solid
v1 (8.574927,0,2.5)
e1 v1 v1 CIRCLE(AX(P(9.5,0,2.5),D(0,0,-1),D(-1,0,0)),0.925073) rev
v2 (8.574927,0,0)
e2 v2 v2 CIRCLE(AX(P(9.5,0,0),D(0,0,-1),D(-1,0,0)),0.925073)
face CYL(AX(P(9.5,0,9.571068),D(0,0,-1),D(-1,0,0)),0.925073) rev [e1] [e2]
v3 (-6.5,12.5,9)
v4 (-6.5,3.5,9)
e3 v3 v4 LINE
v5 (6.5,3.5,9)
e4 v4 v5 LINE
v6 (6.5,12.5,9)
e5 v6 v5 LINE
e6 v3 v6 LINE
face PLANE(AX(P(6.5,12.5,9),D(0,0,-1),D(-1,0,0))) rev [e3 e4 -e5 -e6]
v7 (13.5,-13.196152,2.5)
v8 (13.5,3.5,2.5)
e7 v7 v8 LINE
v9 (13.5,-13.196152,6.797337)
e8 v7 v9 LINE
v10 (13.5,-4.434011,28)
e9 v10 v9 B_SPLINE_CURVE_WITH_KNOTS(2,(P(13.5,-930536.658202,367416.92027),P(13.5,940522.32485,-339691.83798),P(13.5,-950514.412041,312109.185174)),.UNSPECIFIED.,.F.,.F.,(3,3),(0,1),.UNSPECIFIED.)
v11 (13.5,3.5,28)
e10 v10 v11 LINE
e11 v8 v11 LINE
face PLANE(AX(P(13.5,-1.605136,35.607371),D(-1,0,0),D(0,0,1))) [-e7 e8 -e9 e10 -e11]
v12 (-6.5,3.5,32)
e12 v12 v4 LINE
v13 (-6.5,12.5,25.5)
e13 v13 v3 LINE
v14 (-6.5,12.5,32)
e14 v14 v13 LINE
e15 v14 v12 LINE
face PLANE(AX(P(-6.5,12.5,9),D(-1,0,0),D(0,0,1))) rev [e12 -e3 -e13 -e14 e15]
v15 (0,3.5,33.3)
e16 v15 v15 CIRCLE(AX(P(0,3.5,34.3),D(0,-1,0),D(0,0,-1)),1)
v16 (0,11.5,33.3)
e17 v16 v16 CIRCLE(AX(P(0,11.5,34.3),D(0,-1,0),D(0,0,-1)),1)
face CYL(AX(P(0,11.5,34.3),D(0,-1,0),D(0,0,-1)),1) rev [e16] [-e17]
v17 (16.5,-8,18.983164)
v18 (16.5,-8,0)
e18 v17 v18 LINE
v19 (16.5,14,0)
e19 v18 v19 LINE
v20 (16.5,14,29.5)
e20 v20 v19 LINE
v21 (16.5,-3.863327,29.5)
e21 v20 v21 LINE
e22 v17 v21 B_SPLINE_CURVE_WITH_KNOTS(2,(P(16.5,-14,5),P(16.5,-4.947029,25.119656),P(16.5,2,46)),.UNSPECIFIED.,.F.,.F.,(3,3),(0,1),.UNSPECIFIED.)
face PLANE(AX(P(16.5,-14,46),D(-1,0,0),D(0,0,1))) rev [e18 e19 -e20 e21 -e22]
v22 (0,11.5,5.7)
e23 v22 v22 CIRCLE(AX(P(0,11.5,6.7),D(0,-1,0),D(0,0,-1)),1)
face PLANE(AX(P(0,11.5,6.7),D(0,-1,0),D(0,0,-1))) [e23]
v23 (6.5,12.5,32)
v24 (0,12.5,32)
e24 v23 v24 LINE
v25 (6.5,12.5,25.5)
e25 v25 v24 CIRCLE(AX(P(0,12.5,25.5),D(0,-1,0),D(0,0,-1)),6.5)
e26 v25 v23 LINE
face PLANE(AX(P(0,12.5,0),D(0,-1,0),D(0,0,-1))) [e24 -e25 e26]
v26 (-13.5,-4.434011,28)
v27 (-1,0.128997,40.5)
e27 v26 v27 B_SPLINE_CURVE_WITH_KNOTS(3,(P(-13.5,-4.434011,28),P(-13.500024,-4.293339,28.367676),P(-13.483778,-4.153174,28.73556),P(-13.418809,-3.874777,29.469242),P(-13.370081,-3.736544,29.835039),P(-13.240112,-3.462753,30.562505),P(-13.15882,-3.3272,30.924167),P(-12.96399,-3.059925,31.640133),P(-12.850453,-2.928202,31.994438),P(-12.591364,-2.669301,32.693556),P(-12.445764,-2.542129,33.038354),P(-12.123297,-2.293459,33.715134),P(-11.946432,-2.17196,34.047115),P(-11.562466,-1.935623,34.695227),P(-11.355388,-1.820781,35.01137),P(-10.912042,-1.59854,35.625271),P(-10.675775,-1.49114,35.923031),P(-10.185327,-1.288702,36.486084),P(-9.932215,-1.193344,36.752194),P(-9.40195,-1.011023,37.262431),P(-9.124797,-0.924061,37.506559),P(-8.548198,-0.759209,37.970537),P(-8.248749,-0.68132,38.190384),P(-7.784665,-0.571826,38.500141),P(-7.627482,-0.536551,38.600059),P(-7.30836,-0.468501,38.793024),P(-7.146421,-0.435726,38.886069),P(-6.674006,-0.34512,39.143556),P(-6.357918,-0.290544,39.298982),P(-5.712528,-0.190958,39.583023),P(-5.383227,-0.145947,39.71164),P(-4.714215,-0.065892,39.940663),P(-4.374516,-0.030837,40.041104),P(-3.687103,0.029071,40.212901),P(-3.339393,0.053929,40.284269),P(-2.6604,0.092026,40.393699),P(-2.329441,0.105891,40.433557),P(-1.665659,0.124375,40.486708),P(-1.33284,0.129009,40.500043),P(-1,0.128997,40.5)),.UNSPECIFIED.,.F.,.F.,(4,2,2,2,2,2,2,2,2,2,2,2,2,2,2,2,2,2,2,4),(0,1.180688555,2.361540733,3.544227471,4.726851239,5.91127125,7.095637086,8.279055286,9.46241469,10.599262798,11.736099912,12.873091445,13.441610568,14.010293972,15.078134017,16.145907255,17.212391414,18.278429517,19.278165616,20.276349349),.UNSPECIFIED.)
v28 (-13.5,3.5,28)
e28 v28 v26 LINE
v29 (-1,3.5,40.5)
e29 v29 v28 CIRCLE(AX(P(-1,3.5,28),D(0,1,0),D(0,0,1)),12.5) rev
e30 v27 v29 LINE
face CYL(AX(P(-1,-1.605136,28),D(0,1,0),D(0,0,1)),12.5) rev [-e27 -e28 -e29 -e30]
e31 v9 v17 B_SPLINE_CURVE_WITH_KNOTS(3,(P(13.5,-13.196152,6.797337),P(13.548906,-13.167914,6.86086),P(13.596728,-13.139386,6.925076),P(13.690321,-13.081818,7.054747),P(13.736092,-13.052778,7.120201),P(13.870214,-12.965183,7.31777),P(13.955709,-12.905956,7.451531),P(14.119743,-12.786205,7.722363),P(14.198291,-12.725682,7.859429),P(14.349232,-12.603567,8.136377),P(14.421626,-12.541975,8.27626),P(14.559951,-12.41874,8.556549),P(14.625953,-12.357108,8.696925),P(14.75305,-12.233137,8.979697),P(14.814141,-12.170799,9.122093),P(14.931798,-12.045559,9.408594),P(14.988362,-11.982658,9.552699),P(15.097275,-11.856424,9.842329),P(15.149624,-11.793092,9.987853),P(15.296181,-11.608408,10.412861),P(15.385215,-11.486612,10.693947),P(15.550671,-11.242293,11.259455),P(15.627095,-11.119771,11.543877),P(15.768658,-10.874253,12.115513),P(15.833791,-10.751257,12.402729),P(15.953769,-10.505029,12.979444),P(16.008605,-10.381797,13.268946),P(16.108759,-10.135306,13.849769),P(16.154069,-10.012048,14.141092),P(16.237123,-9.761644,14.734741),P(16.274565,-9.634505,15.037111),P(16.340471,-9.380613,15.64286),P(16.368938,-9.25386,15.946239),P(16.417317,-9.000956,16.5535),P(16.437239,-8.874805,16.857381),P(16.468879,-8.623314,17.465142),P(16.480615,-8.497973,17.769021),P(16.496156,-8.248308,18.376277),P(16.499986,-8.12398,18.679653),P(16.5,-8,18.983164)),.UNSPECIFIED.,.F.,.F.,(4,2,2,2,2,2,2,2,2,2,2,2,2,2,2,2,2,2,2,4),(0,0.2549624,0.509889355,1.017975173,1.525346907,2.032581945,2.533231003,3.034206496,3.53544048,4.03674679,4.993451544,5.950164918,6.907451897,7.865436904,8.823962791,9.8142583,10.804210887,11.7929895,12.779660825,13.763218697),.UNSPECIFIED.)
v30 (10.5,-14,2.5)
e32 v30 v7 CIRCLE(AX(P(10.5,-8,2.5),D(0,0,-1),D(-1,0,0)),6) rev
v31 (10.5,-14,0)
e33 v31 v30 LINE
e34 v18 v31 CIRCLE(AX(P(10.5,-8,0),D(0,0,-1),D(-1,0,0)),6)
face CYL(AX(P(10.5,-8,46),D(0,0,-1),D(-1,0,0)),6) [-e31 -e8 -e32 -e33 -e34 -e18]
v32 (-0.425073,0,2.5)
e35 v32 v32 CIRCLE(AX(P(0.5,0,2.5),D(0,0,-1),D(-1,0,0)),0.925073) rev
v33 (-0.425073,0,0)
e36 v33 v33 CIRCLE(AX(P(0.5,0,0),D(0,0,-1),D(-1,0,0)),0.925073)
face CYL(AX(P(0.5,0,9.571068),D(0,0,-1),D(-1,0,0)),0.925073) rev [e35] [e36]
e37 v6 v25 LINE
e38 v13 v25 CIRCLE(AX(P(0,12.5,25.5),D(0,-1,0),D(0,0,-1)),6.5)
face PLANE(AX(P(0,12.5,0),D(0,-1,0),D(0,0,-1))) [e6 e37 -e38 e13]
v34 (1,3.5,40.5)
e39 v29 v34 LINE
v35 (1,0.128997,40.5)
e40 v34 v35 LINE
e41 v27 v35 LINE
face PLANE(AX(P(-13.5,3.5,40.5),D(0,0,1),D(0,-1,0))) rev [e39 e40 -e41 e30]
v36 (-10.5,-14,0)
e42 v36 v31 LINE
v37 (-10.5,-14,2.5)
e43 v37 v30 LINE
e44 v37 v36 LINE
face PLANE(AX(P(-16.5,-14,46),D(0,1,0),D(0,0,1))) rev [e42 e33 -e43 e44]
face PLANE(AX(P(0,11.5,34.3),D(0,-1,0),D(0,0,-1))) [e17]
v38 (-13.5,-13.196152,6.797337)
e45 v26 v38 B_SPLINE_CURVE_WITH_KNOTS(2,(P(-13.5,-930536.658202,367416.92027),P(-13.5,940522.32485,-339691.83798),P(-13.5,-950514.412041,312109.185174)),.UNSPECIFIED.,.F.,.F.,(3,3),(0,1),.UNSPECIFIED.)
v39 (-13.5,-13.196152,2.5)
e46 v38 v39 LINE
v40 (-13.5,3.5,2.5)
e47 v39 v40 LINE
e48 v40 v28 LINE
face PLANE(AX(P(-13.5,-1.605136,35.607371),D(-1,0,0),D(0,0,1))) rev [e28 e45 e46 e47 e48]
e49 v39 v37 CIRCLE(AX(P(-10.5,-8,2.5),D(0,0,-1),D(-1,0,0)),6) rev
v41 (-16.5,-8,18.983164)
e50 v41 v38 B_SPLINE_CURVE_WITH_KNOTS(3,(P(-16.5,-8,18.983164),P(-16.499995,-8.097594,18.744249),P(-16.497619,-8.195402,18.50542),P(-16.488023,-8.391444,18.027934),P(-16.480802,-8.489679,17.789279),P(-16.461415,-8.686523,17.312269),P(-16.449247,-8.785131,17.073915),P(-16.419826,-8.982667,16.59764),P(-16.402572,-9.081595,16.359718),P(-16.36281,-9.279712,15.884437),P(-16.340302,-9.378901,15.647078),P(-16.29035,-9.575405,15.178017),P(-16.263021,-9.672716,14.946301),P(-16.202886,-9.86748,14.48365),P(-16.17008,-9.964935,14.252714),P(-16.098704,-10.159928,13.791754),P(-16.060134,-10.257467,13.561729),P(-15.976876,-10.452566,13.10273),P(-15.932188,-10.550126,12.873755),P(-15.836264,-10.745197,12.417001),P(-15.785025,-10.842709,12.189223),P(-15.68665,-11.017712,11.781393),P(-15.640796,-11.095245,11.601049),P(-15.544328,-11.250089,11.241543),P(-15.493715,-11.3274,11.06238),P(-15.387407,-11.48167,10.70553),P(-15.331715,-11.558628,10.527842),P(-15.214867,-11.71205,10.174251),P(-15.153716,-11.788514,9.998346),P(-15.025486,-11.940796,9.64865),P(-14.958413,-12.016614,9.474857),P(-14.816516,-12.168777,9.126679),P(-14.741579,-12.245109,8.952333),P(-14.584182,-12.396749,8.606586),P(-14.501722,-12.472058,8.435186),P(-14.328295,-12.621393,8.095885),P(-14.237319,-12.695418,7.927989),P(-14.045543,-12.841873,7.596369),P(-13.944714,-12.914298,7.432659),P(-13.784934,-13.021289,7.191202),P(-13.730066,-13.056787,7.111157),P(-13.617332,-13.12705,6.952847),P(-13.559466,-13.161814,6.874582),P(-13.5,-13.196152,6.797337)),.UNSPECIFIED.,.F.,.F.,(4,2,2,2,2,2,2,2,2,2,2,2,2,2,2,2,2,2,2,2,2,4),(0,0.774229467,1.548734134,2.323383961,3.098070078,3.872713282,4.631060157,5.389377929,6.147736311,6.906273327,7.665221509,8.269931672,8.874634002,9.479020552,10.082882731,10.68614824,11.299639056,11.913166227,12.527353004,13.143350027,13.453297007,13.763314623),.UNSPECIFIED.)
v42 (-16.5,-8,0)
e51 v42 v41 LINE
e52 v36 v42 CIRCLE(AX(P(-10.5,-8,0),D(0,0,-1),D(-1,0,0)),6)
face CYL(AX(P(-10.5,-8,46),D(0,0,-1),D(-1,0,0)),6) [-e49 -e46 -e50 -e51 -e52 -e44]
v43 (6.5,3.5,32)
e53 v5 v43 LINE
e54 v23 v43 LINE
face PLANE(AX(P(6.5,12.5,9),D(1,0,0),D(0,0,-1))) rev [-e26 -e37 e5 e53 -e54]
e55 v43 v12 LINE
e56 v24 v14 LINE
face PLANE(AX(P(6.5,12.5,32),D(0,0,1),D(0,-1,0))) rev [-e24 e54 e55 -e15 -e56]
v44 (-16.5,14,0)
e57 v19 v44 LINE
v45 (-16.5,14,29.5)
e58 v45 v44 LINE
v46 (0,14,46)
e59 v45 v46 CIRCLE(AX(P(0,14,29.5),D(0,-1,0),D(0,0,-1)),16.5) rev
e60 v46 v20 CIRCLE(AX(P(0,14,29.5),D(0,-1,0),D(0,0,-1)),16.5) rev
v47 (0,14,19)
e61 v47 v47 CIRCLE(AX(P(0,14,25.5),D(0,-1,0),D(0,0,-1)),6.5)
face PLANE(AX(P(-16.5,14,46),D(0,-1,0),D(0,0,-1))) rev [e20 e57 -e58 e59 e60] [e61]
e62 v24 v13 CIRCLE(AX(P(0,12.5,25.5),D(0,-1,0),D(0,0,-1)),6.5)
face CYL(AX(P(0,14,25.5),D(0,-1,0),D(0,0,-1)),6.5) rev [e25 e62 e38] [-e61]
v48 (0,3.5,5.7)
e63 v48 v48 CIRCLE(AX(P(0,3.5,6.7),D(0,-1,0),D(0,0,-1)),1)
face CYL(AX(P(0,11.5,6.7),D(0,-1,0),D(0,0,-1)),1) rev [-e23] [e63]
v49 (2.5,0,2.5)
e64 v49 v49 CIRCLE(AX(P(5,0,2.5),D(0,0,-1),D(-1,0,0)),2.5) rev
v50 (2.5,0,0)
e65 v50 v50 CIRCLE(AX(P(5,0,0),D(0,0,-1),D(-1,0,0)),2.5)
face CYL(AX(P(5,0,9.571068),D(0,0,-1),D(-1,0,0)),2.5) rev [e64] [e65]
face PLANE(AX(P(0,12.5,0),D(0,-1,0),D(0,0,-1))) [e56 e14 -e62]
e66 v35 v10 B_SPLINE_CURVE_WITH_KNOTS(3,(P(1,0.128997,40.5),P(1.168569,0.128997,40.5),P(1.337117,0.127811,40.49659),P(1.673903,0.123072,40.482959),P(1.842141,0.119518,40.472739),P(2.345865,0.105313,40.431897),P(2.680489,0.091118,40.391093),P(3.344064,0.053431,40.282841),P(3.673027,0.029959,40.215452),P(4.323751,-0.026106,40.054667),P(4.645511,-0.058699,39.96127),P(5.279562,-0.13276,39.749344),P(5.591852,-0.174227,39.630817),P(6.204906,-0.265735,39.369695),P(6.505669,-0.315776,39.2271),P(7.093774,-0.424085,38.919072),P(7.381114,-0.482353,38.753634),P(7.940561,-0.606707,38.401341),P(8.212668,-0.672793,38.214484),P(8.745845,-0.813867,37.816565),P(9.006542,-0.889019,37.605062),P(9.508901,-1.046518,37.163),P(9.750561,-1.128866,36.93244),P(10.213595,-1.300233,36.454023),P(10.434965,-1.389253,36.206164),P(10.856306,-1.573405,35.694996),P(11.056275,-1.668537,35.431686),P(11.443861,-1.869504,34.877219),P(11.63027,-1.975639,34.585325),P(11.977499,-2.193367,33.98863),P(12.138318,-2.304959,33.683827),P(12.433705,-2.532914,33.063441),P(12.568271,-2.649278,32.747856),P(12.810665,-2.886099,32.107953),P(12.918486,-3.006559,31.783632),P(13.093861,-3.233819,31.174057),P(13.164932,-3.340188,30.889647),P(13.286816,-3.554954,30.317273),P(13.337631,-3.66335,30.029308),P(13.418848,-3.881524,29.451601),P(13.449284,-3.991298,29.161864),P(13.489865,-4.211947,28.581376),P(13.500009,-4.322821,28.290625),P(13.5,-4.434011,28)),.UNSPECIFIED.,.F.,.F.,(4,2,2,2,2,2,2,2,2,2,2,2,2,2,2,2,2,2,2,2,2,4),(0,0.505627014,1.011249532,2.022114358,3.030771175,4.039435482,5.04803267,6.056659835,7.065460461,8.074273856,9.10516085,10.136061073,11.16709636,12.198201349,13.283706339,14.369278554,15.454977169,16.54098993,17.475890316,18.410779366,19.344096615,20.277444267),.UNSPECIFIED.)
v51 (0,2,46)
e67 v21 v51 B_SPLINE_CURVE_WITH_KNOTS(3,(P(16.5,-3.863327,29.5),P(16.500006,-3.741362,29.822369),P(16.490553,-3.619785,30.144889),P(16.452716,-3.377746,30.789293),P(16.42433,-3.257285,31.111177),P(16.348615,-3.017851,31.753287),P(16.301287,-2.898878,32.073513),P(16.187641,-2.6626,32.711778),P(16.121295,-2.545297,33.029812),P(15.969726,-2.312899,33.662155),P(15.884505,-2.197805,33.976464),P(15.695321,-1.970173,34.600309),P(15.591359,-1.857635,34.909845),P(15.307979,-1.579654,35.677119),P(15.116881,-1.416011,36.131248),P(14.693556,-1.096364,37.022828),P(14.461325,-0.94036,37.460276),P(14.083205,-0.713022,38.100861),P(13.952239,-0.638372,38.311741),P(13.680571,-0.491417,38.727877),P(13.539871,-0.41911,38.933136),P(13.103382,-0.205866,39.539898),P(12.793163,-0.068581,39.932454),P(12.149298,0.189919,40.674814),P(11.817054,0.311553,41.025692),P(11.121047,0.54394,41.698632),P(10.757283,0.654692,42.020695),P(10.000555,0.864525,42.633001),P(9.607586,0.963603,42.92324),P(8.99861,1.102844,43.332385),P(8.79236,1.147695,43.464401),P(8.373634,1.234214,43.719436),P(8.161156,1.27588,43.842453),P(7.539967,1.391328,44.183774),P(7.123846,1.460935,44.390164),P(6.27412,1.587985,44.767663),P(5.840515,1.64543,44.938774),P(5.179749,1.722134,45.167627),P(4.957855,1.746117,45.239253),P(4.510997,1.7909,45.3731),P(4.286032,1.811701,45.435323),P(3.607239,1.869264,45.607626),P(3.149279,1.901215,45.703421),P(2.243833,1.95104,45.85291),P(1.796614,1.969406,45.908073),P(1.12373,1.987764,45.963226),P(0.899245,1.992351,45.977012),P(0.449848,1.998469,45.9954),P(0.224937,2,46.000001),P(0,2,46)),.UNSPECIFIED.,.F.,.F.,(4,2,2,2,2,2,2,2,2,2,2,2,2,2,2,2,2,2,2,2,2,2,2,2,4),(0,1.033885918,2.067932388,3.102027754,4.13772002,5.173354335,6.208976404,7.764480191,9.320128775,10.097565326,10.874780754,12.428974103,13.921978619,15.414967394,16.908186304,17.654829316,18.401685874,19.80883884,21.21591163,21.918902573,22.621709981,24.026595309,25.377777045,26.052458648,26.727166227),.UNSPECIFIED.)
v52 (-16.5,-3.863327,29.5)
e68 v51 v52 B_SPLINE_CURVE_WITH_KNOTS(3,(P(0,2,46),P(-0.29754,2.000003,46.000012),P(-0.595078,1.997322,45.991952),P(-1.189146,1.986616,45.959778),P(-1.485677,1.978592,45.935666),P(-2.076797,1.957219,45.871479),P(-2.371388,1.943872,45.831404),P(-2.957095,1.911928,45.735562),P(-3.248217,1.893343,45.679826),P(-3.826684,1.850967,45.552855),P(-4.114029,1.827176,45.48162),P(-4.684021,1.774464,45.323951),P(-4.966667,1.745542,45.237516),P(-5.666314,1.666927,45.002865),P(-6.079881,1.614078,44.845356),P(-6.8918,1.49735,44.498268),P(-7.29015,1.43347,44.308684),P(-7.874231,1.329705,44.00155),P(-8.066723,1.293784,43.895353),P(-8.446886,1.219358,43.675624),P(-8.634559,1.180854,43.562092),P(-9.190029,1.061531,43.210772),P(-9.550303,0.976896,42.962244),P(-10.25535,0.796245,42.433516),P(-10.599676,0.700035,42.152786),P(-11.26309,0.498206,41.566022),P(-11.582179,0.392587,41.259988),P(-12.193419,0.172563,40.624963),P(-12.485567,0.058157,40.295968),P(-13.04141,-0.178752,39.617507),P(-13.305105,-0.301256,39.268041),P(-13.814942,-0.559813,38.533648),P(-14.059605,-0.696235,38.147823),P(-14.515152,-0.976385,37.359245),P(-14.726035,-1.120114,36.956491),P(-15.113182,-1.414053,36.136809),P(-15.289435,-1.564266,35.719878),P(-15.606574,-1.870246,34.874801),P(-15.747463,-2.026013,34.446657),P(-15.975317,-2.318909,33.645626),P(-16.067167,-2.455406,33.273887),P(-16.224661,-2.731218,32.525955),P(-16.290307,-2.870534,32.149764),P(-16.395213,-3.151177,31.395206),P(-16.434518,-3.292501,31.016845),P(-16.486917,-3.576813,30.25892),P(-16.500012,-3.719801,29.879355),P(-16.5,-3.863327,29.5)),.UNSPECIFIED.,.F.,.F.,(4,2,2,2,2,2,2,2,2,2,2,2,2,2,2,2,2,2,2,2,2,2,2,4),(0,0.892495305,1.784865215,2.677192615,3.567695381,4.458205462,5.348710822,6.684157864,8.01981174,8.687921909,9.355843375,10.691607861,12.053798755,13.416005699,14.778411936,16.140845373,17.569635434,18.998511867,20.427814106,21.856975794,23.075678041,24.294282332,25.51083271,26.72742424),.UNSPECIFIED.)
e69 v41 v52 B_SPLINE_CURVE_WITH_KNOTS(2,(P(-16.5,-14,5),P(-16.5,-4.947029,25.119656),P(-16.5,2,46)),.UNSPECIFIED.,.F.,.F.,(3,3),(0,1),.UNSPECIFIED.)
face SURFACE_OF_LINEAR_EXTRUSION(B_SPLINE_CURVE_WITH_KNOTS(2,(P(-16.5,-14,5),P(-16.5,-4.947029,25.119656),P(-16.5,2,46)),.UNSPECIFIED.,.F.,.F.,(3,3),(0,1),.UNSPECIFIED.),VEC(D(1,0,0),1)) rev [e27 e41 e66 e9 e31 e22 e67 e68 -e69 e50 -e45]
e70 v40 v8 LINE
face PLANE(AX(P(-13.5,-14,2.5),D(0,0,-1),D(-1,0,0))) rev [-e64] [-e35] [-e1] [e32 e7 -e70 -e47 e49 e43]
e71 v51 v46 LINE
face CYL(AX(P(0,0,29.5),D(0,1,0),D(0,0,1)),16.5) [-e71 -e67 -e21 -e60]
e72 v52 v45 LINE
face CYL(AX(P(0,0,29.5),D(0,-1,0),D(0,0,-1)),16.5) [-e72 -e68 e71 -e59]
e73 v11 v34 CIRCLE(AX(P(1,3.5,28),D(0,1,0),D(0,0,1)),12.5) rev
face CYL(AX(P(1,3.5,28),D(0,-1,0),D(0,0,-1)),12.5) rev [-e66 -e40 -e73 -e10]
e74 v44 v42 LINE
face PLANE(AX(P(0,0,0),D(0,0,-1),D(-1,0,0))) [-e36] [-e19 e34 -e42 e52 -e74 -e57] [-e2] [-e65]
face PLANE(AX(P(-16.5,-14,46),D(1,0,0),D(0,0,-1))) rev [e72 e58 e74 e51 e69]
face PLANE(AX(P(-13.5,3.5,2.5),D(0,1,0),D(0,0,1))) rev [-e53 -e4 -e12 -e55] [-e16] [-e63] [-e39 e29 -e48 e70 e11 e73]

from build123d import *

# Parameters (mm, degrees)
SKETCH1_W           = 33
SKETCH1_H           = 28
BOSS_EXTRUDE1_DEPTH = 46
CUT_EXTRUDE1_DEPTH  = 59.318093247
CUT_EXTRUDE4_START  = -3
CUT_EXTRUDE4_DEPTH  = 27
FILLET1_R           = 12.5
FILLET2_R           = 16.5
FILLET3_R           = 6
SKETCH5_W           = 13
SKETCH5_H           = 23
CUT_EXTRUDE8_DEPTH  = 9
SKETCH6_R           = 6.5
CUT_EXTRUDE9_DEPTH  = 56.592265809
SKETCH7_R           = 1
CUT_EXTRUDE10_DEPTH = 8
SKETCH8_R           = 0.925072744
SKETCH8_R_2         = 2.5
CUT_EXTRUDE11_DEPTH = 2.5


with BuildPart() as part:
    # Sketch1 → Boss-Extrude1 (new body)
    with BuildSketch(Plane.XY):
        Rectangle(SKETCH1_W, SKETCH1_H)
    extrude(amount=BOSS_EXTRUDE1_DEPTH)

    # Sketch3 → Cut-Extrude1 (cut, through all)
    with BuildSketch(Plane(origin=(16.5, 0, 0), x_dir=(0, 0, -1), z_dir=(1, 0, 0))):
        with BuildLine():
            Line((-46, 2), (-46, -14))
            Line((-46, -14), (-5, -14))
            add(Edge.make_bspline(
                [(-5, -14), (-25.11965555, -4.947029267), (-46, 2)],
                knots=[0, 0, 0, 1, 1, 1], degree=2))
        make_face()
    extrude(amount=-CUT_EXTRUDE1_DEPTH, mode=Mode.SUBTRACT)

    # Sketch4 → Cut-Extrude4 (cut)
    with BuildSketch(Plane(origin=(16.5, 0, 0), x_dir=(0, 0, -1), z_dir=(1, 0, 0)).offset(CUT_EXTRUDE4_START)):
        with BuildLine():
            Line((-5, -14), (-2.5, -14))
            Line((-2.5, -14), (-2.5, 3.5))
            Line((-2.5, 3.5), (-40.5, 3.5))
            Line((-40.5, 3.5), (-40.5, 0.128997137))
            add(Edge.make_bspline(
                [(-5, -14), (-22.463452761, -6.142205101), (-40.5, 0.128997137)],
                knots=[0, 0, 0, 1, 1, 1], degree=2))
        make_face()
    extrude(amount=-CUT_EXTRUDE4_DEPTH, mode=Mode.SUBTRACT)

    # Fillet1
    fillet1_edges = [part.edges().sort_by_distance(p)[0] for p in [
        (13.5, 1.814498569, 40.5),
        (-13.5, 1.814498569, 40.5),
    ]]
    fillet(fillet1_edges, radius=FILLET1_R)

    # Fillet2
    fillet2_edges = [part.edges().sort_by_distance(p)[0] for p in [
        (-16.5, 8, 46),
        (16.5, 8, 46),
    ]]
    fillet(fillet2_edges, radius=FILLET2_R - 0.0001)  # a hair under: the kernel refuses the full size

    # Fillet3
    fillet3_edges = [part.edges().sort_by_distance(p)[0] for p in [
        (-16.5, -14, 2.5),
        (16.5, -14, 2.5),
    ]]
    fillet(fillet3_edges, radius=FILLET3_R)

    # Sketch5 → Cut-Extrude8 (cut)
    with BuildSketch(Plane.XZ.offset(-3.5)):
        with Locations((0, 20.5)):
            Rectangle(SKETCH5_W, SKETCH5_H)
    extrude(amount=-CUT_EXTRUDE8_DEPTH, mode=Mode.SUBTRACT)

    # Sketch6 → Cut-Extrude9 (cut, through all)
    with BuildSketch(Plane.XZ.offset(-12.5)):
        with Locations(Location((0, 25.5, 0), (0, 0, 270))):
            Circle(SKETCH6_R)
    extrude(amount=-CUT_EXTRUDE9_DEPTH, mode=Mode.SUBTRACT)

    # Sketch7 → Cut-Extrude10 (cut)
    with BuildSketch(Plane.XZ.offset(-3.5)):
        with Locations(Location((0, 34.3, 0), (0, 0, 270))):
            Circle(SKETCH7_R)
        with Locations(Location((0, 6.7, 0), (0, 0, 270))):
            Circle(SKETCH7_R)
    extrude(amount=-CUT_EXTRUDE10_DEPTH, mode=Mode.SUBTRACT)

    # Sketch8 → Cut-Extrude11 (cut)
    with BuildSketch(Plane(origin=(0, 0, 0), x_dir=(-1, 0, 0), z_dir=(0, 0, -1))):
        with Locations((-9.5, 0)):
            Circle(SKETCH8_R)
        with Locations((-5, 0)):
            Circle(SKETCH8_R_2)
        with Locations((-0.5, 0)):
            Circle(SKETCH8_R)
    extrude(amount=-CUT_EXTRUDE11_DEPTH, mode=Mode.SUBTRACT)


solid = part.part
